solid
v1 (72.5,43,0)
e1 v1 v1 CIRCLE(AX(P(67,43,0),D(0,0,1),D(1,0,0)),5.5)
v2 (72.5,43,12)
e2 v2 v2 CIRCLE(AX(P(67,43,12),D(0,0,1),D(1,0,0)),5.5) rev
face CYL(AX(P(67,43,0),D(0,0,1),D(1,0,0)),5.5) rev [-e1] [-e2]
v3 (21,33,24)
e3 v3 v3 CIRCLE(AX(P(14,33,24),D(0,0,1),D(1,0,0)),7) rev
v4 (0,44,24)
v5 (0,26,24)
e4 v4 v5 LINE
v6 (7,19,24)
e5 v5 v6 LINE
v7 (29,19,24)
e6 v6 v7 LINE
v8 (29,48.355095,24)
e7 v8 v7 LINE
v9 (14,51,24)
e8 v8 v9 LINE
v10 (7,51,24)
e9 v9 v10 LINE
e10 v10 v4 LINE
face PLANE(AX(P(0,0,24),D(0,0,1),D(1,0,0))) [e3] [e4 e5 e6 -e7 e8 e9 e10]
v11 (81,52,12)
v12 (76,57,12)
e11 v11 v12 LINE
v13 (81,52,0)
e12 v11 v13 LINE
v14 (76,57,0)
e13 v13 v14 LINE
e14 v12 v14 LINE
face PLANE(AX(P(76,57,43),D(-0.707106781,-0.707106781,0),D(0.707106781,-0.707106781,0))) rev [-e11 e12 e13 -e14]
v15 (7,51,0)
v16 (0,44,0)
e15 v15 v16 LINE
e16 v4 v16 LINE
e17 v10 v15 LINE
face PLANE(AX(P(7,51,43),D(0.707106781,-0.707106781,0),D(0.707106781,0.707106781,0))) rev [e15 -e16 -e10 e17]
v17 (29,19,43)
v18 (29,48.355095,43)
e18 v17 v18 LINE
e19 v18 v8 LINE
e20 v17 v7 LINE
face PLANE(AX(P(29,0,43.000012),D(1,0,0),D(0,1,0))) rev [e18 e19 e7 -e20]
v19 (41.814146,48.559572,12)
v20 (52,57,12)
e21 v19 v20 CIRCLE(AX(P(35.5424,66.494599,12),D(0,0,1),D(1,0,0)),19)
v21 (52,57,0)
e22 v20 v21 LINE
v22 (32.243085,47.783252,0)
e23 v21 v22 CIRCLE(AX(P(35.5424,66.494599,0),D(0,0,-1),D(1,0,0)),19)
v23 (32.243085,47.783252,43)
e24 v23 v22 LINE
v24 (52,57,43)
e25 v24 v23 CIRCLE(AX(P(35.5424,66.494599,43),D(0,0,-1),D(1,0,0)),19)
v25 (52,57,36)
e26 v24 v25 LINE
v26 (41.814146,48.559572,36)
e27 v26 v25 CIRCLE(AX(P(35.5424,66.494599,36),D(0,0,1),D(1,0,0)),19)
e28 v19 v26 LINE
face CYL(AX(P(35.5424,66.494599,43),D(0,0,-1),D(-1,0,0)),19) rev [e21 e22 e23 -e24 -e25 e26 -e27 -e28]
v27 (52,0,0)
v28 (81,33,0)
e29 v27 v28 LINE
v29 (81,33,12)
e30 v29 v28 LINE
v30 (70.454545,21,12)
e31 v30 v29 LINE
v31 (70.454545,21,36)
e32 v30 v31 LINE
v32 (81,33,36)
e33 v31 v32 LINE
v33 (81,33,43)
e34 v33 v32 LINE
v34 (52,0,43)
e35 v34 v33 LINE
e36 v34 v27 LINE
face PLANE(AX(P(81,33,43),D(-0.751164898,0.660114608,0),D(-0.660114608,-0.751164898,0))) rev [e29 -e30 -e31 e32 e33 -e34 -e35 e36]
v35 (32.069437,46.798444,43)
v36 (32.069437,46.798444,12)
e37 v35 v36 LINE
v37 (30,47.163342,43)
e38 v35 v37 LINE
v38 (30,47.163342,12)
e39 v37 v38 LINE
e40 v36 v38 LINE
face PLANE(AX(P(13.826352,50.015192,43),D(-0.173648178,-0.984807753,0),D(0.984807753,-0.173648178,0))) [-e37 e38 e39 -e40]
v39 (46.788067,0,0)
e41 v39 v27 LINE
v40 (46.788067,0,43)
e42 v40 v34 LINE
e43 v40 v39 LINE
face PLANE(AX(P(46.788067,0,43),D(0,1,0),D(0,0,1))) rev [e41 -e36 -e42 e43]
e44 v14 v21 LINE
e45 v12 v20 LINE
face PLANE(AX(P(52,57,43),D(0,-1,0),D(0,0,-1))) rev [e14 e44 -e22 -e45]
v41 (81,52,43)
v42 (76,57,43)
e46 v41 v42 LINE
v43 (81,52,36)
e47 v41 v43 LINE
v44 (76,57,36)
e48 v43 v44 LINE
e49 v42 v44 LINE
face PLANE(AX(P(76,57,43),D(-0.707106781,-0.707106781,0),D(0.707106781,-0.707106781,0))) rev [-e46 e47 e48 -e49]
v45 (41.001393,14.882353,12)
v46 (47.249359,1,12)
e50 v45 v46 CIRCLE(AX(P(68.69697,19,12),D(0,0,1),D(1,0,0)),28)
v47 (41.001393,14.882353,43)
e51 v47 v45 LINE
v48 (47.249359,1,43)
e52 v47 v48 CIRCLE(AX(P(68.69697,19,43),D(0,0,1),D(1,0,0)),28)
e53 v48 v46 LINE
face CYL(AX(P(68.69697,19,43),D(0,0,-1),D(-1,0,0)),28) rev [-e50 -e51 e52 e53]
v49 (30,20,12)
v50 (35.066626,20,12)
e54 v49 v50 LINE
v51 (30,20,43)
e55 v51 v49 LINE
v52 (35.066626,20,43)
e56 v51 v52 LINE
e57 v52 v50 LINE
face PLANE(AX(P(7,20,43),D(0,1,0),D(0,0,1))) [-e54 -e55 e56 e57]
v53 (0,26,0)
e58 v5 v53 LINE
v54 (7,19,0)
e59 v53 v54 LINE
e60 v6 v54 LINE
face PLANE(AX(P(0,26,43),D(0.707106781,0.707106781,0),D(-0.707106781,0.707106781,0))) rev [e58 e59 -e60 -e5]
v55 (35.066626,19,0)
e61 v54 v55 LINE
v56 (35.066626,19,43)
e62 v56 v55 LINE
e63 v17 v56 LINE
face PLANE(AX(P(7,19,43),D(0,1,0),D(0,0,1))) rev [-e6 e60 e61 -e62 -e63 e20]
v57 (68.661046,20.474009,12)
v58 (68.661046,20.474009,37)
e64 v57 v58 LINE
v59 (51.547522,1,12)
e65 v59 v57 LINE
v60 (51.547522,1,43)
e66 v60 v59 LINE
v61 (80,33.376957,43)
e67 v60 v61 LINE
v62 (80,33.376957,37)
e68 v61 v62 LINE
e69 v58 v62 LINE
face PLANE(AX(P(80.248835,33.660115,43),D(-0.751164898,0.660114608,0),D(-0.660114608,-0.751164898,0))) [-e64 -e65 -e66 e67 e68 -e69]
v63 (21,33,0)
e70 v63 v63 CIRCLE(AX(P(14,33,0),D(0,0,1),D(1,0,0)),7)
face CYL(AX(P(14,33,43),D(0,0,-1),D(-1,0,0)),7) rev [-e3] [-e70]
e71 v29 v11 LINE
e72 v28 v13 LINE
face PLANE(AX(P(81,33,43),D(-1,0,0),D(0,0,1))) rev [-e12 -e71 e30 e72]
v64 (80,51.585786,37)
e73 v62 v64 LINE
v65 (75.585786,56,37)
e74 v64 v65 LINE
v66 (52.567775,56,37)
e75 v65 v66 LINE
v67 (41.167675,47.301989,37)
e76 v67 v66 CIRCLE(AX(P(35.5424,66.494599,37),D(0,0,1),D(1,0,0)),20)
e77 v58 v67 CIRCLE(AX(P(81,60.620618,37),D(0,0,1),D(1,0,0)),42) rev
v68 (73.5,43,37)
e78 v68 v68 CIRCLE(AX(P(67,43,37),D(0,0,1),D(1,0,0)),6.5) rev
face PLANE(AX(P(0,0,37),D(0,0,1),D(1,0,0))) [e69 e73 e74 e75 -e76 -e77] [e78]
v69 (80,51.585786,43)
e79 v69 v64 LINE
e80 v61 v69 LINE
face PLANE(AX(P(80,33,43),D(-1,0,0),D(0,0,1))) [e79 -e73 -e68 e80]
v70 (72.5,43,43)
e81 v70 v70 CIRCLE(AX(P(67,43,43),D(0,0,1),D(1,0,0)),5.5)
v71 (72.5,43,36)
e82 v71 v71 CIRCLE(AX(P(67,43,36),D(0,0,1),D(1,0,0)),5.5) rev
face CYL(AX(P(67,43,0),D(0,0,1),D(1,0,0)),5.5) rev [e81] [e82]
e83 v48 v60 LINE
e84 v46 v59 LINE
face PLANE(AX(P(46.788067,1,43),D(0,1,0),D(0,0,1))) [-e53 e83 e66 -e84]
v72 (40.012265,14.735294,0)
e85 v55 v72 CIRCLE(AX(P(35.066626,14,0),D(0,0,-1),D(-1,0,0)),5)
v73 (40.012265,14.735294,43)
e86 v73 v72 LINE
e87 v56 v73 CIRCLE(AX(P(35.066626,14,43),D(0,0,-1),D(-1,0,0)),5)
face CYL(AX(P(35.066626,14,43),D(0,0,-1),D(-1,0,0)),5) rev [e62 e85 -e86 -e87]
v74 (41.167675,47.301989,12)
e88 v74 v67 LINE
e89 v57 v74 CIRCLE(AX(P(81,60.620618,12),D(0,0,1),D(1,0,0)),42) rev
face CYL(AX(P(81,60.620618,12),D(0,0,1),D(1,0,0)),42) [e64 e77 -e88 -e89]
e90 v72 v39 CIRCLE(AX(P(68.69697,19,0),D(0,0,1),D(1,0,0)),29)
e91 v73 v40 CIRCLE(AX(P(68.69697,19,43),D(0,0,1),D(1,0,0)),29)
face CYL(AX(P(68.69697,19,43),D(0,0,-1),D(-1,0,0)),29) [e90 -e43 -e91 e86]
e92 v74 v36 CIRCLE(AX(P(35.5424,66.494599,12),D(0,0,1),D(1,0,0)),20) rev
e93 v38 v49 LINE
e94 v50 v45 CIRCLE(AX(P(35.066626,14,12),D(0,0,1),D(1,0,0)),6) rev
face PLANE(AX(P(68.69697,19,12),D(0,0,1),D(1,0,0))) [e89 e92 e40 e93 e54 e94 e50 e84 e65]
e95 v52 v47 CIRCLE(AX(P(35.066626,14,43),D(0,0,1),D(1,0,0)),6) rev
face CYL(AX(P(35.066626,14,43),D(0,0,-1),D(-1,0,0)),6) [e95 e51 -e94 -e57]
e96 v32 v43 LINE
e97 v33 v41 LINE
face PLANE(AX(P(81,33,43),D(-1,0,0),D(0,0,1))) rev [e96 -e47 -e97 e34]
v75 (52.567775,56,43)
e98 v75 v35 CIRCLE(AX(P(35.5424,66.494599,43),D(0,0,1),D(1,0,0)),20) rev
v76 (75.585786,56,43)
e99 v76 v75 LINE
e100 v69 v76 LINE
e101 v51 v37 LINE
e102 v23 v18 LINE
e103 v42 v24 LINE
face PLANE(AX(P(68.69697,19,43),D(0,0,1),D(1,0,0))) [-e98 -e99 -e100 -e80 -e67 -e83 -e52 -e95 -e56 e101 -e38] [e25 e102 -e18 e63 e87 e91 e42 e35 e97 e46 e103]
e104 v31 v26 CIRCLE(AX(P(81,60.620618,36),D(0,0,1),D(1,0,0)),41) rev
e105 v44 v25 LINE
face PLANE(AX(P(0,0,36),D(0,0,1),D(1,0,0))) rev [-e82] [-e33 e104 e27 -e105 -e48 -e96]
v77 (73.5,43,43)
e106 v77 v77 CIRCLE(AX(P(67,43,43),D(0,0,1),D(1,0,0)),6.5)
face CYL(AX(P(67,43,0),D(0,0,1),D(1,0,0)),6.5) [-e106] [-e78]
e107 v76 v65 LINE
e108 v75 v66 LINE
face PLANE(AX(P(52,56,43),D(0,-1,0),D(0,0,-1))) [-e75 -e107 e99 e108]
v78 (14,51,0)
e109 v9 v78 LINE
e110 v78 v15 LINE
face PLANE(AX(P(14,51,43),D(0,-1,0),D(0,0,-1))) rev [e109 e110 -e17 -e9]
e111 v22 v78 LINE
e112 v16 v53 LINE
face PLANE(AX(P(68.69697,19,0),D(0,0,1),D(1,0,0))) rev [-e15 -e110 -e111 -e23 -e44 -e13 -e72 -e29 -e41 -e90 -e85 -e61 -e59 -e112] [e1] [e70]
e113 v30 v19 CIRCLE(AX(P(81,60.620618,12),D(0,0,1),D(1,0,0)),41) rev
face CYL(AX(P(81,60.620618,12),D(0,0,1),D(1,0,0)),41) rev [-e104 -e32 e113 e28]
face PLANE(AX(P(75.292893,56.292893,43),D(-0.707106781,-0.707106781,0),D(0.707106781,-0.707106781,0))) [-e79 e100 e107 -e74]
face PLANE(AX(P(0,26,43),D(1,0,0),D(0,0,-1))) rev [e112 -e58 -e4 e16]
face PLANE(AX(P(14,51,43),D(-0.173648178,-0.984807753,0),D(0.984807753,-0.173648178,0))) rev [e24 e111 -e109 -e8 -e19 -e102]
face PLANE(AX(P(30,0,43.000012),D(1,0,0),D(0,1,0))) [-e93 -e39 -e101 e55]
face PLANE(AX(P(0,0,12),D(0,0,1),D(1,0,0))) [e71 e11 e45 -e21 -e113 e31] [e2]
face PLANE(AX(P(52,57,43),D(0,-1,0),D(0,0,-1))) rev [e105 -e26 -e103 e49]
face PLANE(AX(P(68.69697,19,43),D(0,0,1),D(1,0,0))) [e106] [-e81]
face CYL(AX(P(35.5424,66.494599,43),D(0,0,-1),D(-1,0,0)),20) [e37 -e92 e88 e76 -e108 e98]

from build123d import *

# Parameters (mm, degrees)
SKETCH2_R               = 7
BOSS_EXTRUDE1_DEPTH     = 43
SKETCH3_R               = 5.5
CUT_EXTRUDE1_DEPTH      = 108.976849371
CUT_EXTRUDE2_DEPTH      = 108.976849371
CUT_EXTRUDE2_DEPTH_BACK = 19
SKETCH4_R               = 7
CUT_EXTRUDE12_START     = -24
CUT_EXTRUDE12_DEPTH     = 24
SHELL2_START            = 12
SHELL2_DEPTH            = 31
SHELL2_START_2          = 37
SHELL2_2_OUTLINE_R      = 6.5
SHELL2_2_DEPTH          = 6


# Read off the part's stored shape, not the designer's step: Shell2
with BuildPart() as part:
    # Sketch2 → Boss-Extrude1 (new body)
    with BuildSketch(Plane.XY):
        with BuildLine():
            Line((76, 57), (81, 52))
            Line((81, 52), (81, 33))
            Line((81, 33), (52, 0))
            Line((52, 0), (46.788067397, 0))
            ThreePointArc((46.788067397, 0), (42.3490952, 6.884327939), (40.012264997, 14.735294118))
            ThreePointArc((40.012264997, 14.735294118), (38.331862036, 17.786586232), (35.066626255, 19))
            Line((35.066626255, 19), (7, 19))
            Line((7, 19), (0, 26))
            Line((0, 26), (0, 44))
            Line((0, 44), (7, 51))
            Line((7, 51), (14, 51))
            Line((14, 51), (32.243084988, 47.783251905))
            ThreePointArc((32.243084988, 47.783251905), (43.574972961, 49.276069151), (52, 57))
            Line((52, 57), (76, 57))
        make_face()
        with Locations((14, 33)):
            Circle(SKETCH2_R, mode=Mode.SUBTRACT)
    extrude(amount=BOSS_EXTRUDE1_DEPTH)

    # Sketch3 → Cut-Extrude1 (cut, through all)
    with BuildSketch(Plane.XY.offset(43)):
        with Locations((67, 43)):
            Circle(SKETCH3_R)
    extrude(amount=-CUT_EXTRUDE1_DEPTH, mode=Mode.SUBTRACT)

    # Sketch4 → Cut-Extrude2 (cut, two sides: drawn at the far end of the back side and taken through both)
    with BuildSketch(Plane.XY.offset(43).offset(-CUT_EXTRUDE2_DEPTH_BACK)):
        Polygon((29, 19), (29, 48.355095289), (14, 51), (7, 51), (0, 44), (0, 26), (7, 19), align=None)
        with Locations((14, 33)):
            Circle(SKETCH4_R, mode=Mode.SUBTRACT)
    extrude(amount=CUT_EXTRUDE2_DEPTH + CUT_EXTRUDE2_DEPTH_BACK, mode=Mode.SUBTRACT)

    # Sketch7 → Cut-Extrude12 (cut)
    with BuildSketch(Plane.XY.offset(36).offset(CUT_EXTRUDE12_START)):
        with BuildLine():
            ThreePointArc((52, 57), (47.665353397, 51.864697991), (41.814145925, 48.559571819))
            ThreePointArc((41.814145925, 48.559571819), (52.571435773, 31.077146254), (70.454545455, 21))
            Line((70.454545455, 21), (81, 33))
            Line((81, 33), (81, 52))
            Line((81, 52), (76, 57))
            Line((76, 57), (52, 57))
        make_face()
    extrude(amount=CUT_EXTRUDE12_DEPTH, mode=Mode.SUBTRACT)

    # Shell2 outline → Shell2 (cut)
    with BuildSketch(Plane.XY.offset(SHELL2_START)):
        with BuildLine():
            Line((51.547522264, 1), (68.661045623, 20.47400934))
            ThreePointArc((68.661045623, 20.47400934), (51.667497173, 30.560606948), (41.16767498, 47.301989033))
            ThreePointArc((41.16767498, 47.301989033), (36.647615315, 46.525160064), (32.06943681, 46.798444152))
            Line((32.06943681, 46.798444152), (30, 47.163341697))
            Line((30, 47.163341697), (30, 20))
            Line((30, 20), (35.066626255, 20))
            ThreePointArc((35.066626255, 20), (38.984909193, 18.543903479), (41.001392745, 14.882352941))
            ThreePointArc((41.001392745, 14.882352941), (43.163792236, 7.508400948), (47.249359107, 1))
            Line((47.249359107, 1), (51.547522264, 1))
        make_face()
    extrude(amount=SHELL2_DEPTH, mode=Mode.SUBTRACT)

    # Shell2 2 outline → Shell2 2 (cut)
    with BuildSketch(Plane.XY.offset(SHELL2_START_2)):
        with BuildLine():
            Line((68.661045623, 20.47400934), (80, 33.376957423))
            Line((80, 33.376957423), (80, 51.585786438))
            Line((80, 51.585786438), (75.585786438, 56))
            Line((75.585786438, 56), (52.567775172, 56))
            ThreePointArc((52.567775172, 56), (47.674046111, 50.594185021), (41.16767498, 47.301989034))
            ThreePointArc((41.16767498, 47.301989034), (51.667497173, 30.560606948), (68.661045623, 20.47400934))
        make_face()
        with Locations((67, 43)):
            Circle(SHELL2_2_OUTLINE_R, mode=Mode.SUBTRACT)
    extrude(amount=SHELL2_2_DEPTH, mode=Mode.SUBTRACT)


solid = part.part
